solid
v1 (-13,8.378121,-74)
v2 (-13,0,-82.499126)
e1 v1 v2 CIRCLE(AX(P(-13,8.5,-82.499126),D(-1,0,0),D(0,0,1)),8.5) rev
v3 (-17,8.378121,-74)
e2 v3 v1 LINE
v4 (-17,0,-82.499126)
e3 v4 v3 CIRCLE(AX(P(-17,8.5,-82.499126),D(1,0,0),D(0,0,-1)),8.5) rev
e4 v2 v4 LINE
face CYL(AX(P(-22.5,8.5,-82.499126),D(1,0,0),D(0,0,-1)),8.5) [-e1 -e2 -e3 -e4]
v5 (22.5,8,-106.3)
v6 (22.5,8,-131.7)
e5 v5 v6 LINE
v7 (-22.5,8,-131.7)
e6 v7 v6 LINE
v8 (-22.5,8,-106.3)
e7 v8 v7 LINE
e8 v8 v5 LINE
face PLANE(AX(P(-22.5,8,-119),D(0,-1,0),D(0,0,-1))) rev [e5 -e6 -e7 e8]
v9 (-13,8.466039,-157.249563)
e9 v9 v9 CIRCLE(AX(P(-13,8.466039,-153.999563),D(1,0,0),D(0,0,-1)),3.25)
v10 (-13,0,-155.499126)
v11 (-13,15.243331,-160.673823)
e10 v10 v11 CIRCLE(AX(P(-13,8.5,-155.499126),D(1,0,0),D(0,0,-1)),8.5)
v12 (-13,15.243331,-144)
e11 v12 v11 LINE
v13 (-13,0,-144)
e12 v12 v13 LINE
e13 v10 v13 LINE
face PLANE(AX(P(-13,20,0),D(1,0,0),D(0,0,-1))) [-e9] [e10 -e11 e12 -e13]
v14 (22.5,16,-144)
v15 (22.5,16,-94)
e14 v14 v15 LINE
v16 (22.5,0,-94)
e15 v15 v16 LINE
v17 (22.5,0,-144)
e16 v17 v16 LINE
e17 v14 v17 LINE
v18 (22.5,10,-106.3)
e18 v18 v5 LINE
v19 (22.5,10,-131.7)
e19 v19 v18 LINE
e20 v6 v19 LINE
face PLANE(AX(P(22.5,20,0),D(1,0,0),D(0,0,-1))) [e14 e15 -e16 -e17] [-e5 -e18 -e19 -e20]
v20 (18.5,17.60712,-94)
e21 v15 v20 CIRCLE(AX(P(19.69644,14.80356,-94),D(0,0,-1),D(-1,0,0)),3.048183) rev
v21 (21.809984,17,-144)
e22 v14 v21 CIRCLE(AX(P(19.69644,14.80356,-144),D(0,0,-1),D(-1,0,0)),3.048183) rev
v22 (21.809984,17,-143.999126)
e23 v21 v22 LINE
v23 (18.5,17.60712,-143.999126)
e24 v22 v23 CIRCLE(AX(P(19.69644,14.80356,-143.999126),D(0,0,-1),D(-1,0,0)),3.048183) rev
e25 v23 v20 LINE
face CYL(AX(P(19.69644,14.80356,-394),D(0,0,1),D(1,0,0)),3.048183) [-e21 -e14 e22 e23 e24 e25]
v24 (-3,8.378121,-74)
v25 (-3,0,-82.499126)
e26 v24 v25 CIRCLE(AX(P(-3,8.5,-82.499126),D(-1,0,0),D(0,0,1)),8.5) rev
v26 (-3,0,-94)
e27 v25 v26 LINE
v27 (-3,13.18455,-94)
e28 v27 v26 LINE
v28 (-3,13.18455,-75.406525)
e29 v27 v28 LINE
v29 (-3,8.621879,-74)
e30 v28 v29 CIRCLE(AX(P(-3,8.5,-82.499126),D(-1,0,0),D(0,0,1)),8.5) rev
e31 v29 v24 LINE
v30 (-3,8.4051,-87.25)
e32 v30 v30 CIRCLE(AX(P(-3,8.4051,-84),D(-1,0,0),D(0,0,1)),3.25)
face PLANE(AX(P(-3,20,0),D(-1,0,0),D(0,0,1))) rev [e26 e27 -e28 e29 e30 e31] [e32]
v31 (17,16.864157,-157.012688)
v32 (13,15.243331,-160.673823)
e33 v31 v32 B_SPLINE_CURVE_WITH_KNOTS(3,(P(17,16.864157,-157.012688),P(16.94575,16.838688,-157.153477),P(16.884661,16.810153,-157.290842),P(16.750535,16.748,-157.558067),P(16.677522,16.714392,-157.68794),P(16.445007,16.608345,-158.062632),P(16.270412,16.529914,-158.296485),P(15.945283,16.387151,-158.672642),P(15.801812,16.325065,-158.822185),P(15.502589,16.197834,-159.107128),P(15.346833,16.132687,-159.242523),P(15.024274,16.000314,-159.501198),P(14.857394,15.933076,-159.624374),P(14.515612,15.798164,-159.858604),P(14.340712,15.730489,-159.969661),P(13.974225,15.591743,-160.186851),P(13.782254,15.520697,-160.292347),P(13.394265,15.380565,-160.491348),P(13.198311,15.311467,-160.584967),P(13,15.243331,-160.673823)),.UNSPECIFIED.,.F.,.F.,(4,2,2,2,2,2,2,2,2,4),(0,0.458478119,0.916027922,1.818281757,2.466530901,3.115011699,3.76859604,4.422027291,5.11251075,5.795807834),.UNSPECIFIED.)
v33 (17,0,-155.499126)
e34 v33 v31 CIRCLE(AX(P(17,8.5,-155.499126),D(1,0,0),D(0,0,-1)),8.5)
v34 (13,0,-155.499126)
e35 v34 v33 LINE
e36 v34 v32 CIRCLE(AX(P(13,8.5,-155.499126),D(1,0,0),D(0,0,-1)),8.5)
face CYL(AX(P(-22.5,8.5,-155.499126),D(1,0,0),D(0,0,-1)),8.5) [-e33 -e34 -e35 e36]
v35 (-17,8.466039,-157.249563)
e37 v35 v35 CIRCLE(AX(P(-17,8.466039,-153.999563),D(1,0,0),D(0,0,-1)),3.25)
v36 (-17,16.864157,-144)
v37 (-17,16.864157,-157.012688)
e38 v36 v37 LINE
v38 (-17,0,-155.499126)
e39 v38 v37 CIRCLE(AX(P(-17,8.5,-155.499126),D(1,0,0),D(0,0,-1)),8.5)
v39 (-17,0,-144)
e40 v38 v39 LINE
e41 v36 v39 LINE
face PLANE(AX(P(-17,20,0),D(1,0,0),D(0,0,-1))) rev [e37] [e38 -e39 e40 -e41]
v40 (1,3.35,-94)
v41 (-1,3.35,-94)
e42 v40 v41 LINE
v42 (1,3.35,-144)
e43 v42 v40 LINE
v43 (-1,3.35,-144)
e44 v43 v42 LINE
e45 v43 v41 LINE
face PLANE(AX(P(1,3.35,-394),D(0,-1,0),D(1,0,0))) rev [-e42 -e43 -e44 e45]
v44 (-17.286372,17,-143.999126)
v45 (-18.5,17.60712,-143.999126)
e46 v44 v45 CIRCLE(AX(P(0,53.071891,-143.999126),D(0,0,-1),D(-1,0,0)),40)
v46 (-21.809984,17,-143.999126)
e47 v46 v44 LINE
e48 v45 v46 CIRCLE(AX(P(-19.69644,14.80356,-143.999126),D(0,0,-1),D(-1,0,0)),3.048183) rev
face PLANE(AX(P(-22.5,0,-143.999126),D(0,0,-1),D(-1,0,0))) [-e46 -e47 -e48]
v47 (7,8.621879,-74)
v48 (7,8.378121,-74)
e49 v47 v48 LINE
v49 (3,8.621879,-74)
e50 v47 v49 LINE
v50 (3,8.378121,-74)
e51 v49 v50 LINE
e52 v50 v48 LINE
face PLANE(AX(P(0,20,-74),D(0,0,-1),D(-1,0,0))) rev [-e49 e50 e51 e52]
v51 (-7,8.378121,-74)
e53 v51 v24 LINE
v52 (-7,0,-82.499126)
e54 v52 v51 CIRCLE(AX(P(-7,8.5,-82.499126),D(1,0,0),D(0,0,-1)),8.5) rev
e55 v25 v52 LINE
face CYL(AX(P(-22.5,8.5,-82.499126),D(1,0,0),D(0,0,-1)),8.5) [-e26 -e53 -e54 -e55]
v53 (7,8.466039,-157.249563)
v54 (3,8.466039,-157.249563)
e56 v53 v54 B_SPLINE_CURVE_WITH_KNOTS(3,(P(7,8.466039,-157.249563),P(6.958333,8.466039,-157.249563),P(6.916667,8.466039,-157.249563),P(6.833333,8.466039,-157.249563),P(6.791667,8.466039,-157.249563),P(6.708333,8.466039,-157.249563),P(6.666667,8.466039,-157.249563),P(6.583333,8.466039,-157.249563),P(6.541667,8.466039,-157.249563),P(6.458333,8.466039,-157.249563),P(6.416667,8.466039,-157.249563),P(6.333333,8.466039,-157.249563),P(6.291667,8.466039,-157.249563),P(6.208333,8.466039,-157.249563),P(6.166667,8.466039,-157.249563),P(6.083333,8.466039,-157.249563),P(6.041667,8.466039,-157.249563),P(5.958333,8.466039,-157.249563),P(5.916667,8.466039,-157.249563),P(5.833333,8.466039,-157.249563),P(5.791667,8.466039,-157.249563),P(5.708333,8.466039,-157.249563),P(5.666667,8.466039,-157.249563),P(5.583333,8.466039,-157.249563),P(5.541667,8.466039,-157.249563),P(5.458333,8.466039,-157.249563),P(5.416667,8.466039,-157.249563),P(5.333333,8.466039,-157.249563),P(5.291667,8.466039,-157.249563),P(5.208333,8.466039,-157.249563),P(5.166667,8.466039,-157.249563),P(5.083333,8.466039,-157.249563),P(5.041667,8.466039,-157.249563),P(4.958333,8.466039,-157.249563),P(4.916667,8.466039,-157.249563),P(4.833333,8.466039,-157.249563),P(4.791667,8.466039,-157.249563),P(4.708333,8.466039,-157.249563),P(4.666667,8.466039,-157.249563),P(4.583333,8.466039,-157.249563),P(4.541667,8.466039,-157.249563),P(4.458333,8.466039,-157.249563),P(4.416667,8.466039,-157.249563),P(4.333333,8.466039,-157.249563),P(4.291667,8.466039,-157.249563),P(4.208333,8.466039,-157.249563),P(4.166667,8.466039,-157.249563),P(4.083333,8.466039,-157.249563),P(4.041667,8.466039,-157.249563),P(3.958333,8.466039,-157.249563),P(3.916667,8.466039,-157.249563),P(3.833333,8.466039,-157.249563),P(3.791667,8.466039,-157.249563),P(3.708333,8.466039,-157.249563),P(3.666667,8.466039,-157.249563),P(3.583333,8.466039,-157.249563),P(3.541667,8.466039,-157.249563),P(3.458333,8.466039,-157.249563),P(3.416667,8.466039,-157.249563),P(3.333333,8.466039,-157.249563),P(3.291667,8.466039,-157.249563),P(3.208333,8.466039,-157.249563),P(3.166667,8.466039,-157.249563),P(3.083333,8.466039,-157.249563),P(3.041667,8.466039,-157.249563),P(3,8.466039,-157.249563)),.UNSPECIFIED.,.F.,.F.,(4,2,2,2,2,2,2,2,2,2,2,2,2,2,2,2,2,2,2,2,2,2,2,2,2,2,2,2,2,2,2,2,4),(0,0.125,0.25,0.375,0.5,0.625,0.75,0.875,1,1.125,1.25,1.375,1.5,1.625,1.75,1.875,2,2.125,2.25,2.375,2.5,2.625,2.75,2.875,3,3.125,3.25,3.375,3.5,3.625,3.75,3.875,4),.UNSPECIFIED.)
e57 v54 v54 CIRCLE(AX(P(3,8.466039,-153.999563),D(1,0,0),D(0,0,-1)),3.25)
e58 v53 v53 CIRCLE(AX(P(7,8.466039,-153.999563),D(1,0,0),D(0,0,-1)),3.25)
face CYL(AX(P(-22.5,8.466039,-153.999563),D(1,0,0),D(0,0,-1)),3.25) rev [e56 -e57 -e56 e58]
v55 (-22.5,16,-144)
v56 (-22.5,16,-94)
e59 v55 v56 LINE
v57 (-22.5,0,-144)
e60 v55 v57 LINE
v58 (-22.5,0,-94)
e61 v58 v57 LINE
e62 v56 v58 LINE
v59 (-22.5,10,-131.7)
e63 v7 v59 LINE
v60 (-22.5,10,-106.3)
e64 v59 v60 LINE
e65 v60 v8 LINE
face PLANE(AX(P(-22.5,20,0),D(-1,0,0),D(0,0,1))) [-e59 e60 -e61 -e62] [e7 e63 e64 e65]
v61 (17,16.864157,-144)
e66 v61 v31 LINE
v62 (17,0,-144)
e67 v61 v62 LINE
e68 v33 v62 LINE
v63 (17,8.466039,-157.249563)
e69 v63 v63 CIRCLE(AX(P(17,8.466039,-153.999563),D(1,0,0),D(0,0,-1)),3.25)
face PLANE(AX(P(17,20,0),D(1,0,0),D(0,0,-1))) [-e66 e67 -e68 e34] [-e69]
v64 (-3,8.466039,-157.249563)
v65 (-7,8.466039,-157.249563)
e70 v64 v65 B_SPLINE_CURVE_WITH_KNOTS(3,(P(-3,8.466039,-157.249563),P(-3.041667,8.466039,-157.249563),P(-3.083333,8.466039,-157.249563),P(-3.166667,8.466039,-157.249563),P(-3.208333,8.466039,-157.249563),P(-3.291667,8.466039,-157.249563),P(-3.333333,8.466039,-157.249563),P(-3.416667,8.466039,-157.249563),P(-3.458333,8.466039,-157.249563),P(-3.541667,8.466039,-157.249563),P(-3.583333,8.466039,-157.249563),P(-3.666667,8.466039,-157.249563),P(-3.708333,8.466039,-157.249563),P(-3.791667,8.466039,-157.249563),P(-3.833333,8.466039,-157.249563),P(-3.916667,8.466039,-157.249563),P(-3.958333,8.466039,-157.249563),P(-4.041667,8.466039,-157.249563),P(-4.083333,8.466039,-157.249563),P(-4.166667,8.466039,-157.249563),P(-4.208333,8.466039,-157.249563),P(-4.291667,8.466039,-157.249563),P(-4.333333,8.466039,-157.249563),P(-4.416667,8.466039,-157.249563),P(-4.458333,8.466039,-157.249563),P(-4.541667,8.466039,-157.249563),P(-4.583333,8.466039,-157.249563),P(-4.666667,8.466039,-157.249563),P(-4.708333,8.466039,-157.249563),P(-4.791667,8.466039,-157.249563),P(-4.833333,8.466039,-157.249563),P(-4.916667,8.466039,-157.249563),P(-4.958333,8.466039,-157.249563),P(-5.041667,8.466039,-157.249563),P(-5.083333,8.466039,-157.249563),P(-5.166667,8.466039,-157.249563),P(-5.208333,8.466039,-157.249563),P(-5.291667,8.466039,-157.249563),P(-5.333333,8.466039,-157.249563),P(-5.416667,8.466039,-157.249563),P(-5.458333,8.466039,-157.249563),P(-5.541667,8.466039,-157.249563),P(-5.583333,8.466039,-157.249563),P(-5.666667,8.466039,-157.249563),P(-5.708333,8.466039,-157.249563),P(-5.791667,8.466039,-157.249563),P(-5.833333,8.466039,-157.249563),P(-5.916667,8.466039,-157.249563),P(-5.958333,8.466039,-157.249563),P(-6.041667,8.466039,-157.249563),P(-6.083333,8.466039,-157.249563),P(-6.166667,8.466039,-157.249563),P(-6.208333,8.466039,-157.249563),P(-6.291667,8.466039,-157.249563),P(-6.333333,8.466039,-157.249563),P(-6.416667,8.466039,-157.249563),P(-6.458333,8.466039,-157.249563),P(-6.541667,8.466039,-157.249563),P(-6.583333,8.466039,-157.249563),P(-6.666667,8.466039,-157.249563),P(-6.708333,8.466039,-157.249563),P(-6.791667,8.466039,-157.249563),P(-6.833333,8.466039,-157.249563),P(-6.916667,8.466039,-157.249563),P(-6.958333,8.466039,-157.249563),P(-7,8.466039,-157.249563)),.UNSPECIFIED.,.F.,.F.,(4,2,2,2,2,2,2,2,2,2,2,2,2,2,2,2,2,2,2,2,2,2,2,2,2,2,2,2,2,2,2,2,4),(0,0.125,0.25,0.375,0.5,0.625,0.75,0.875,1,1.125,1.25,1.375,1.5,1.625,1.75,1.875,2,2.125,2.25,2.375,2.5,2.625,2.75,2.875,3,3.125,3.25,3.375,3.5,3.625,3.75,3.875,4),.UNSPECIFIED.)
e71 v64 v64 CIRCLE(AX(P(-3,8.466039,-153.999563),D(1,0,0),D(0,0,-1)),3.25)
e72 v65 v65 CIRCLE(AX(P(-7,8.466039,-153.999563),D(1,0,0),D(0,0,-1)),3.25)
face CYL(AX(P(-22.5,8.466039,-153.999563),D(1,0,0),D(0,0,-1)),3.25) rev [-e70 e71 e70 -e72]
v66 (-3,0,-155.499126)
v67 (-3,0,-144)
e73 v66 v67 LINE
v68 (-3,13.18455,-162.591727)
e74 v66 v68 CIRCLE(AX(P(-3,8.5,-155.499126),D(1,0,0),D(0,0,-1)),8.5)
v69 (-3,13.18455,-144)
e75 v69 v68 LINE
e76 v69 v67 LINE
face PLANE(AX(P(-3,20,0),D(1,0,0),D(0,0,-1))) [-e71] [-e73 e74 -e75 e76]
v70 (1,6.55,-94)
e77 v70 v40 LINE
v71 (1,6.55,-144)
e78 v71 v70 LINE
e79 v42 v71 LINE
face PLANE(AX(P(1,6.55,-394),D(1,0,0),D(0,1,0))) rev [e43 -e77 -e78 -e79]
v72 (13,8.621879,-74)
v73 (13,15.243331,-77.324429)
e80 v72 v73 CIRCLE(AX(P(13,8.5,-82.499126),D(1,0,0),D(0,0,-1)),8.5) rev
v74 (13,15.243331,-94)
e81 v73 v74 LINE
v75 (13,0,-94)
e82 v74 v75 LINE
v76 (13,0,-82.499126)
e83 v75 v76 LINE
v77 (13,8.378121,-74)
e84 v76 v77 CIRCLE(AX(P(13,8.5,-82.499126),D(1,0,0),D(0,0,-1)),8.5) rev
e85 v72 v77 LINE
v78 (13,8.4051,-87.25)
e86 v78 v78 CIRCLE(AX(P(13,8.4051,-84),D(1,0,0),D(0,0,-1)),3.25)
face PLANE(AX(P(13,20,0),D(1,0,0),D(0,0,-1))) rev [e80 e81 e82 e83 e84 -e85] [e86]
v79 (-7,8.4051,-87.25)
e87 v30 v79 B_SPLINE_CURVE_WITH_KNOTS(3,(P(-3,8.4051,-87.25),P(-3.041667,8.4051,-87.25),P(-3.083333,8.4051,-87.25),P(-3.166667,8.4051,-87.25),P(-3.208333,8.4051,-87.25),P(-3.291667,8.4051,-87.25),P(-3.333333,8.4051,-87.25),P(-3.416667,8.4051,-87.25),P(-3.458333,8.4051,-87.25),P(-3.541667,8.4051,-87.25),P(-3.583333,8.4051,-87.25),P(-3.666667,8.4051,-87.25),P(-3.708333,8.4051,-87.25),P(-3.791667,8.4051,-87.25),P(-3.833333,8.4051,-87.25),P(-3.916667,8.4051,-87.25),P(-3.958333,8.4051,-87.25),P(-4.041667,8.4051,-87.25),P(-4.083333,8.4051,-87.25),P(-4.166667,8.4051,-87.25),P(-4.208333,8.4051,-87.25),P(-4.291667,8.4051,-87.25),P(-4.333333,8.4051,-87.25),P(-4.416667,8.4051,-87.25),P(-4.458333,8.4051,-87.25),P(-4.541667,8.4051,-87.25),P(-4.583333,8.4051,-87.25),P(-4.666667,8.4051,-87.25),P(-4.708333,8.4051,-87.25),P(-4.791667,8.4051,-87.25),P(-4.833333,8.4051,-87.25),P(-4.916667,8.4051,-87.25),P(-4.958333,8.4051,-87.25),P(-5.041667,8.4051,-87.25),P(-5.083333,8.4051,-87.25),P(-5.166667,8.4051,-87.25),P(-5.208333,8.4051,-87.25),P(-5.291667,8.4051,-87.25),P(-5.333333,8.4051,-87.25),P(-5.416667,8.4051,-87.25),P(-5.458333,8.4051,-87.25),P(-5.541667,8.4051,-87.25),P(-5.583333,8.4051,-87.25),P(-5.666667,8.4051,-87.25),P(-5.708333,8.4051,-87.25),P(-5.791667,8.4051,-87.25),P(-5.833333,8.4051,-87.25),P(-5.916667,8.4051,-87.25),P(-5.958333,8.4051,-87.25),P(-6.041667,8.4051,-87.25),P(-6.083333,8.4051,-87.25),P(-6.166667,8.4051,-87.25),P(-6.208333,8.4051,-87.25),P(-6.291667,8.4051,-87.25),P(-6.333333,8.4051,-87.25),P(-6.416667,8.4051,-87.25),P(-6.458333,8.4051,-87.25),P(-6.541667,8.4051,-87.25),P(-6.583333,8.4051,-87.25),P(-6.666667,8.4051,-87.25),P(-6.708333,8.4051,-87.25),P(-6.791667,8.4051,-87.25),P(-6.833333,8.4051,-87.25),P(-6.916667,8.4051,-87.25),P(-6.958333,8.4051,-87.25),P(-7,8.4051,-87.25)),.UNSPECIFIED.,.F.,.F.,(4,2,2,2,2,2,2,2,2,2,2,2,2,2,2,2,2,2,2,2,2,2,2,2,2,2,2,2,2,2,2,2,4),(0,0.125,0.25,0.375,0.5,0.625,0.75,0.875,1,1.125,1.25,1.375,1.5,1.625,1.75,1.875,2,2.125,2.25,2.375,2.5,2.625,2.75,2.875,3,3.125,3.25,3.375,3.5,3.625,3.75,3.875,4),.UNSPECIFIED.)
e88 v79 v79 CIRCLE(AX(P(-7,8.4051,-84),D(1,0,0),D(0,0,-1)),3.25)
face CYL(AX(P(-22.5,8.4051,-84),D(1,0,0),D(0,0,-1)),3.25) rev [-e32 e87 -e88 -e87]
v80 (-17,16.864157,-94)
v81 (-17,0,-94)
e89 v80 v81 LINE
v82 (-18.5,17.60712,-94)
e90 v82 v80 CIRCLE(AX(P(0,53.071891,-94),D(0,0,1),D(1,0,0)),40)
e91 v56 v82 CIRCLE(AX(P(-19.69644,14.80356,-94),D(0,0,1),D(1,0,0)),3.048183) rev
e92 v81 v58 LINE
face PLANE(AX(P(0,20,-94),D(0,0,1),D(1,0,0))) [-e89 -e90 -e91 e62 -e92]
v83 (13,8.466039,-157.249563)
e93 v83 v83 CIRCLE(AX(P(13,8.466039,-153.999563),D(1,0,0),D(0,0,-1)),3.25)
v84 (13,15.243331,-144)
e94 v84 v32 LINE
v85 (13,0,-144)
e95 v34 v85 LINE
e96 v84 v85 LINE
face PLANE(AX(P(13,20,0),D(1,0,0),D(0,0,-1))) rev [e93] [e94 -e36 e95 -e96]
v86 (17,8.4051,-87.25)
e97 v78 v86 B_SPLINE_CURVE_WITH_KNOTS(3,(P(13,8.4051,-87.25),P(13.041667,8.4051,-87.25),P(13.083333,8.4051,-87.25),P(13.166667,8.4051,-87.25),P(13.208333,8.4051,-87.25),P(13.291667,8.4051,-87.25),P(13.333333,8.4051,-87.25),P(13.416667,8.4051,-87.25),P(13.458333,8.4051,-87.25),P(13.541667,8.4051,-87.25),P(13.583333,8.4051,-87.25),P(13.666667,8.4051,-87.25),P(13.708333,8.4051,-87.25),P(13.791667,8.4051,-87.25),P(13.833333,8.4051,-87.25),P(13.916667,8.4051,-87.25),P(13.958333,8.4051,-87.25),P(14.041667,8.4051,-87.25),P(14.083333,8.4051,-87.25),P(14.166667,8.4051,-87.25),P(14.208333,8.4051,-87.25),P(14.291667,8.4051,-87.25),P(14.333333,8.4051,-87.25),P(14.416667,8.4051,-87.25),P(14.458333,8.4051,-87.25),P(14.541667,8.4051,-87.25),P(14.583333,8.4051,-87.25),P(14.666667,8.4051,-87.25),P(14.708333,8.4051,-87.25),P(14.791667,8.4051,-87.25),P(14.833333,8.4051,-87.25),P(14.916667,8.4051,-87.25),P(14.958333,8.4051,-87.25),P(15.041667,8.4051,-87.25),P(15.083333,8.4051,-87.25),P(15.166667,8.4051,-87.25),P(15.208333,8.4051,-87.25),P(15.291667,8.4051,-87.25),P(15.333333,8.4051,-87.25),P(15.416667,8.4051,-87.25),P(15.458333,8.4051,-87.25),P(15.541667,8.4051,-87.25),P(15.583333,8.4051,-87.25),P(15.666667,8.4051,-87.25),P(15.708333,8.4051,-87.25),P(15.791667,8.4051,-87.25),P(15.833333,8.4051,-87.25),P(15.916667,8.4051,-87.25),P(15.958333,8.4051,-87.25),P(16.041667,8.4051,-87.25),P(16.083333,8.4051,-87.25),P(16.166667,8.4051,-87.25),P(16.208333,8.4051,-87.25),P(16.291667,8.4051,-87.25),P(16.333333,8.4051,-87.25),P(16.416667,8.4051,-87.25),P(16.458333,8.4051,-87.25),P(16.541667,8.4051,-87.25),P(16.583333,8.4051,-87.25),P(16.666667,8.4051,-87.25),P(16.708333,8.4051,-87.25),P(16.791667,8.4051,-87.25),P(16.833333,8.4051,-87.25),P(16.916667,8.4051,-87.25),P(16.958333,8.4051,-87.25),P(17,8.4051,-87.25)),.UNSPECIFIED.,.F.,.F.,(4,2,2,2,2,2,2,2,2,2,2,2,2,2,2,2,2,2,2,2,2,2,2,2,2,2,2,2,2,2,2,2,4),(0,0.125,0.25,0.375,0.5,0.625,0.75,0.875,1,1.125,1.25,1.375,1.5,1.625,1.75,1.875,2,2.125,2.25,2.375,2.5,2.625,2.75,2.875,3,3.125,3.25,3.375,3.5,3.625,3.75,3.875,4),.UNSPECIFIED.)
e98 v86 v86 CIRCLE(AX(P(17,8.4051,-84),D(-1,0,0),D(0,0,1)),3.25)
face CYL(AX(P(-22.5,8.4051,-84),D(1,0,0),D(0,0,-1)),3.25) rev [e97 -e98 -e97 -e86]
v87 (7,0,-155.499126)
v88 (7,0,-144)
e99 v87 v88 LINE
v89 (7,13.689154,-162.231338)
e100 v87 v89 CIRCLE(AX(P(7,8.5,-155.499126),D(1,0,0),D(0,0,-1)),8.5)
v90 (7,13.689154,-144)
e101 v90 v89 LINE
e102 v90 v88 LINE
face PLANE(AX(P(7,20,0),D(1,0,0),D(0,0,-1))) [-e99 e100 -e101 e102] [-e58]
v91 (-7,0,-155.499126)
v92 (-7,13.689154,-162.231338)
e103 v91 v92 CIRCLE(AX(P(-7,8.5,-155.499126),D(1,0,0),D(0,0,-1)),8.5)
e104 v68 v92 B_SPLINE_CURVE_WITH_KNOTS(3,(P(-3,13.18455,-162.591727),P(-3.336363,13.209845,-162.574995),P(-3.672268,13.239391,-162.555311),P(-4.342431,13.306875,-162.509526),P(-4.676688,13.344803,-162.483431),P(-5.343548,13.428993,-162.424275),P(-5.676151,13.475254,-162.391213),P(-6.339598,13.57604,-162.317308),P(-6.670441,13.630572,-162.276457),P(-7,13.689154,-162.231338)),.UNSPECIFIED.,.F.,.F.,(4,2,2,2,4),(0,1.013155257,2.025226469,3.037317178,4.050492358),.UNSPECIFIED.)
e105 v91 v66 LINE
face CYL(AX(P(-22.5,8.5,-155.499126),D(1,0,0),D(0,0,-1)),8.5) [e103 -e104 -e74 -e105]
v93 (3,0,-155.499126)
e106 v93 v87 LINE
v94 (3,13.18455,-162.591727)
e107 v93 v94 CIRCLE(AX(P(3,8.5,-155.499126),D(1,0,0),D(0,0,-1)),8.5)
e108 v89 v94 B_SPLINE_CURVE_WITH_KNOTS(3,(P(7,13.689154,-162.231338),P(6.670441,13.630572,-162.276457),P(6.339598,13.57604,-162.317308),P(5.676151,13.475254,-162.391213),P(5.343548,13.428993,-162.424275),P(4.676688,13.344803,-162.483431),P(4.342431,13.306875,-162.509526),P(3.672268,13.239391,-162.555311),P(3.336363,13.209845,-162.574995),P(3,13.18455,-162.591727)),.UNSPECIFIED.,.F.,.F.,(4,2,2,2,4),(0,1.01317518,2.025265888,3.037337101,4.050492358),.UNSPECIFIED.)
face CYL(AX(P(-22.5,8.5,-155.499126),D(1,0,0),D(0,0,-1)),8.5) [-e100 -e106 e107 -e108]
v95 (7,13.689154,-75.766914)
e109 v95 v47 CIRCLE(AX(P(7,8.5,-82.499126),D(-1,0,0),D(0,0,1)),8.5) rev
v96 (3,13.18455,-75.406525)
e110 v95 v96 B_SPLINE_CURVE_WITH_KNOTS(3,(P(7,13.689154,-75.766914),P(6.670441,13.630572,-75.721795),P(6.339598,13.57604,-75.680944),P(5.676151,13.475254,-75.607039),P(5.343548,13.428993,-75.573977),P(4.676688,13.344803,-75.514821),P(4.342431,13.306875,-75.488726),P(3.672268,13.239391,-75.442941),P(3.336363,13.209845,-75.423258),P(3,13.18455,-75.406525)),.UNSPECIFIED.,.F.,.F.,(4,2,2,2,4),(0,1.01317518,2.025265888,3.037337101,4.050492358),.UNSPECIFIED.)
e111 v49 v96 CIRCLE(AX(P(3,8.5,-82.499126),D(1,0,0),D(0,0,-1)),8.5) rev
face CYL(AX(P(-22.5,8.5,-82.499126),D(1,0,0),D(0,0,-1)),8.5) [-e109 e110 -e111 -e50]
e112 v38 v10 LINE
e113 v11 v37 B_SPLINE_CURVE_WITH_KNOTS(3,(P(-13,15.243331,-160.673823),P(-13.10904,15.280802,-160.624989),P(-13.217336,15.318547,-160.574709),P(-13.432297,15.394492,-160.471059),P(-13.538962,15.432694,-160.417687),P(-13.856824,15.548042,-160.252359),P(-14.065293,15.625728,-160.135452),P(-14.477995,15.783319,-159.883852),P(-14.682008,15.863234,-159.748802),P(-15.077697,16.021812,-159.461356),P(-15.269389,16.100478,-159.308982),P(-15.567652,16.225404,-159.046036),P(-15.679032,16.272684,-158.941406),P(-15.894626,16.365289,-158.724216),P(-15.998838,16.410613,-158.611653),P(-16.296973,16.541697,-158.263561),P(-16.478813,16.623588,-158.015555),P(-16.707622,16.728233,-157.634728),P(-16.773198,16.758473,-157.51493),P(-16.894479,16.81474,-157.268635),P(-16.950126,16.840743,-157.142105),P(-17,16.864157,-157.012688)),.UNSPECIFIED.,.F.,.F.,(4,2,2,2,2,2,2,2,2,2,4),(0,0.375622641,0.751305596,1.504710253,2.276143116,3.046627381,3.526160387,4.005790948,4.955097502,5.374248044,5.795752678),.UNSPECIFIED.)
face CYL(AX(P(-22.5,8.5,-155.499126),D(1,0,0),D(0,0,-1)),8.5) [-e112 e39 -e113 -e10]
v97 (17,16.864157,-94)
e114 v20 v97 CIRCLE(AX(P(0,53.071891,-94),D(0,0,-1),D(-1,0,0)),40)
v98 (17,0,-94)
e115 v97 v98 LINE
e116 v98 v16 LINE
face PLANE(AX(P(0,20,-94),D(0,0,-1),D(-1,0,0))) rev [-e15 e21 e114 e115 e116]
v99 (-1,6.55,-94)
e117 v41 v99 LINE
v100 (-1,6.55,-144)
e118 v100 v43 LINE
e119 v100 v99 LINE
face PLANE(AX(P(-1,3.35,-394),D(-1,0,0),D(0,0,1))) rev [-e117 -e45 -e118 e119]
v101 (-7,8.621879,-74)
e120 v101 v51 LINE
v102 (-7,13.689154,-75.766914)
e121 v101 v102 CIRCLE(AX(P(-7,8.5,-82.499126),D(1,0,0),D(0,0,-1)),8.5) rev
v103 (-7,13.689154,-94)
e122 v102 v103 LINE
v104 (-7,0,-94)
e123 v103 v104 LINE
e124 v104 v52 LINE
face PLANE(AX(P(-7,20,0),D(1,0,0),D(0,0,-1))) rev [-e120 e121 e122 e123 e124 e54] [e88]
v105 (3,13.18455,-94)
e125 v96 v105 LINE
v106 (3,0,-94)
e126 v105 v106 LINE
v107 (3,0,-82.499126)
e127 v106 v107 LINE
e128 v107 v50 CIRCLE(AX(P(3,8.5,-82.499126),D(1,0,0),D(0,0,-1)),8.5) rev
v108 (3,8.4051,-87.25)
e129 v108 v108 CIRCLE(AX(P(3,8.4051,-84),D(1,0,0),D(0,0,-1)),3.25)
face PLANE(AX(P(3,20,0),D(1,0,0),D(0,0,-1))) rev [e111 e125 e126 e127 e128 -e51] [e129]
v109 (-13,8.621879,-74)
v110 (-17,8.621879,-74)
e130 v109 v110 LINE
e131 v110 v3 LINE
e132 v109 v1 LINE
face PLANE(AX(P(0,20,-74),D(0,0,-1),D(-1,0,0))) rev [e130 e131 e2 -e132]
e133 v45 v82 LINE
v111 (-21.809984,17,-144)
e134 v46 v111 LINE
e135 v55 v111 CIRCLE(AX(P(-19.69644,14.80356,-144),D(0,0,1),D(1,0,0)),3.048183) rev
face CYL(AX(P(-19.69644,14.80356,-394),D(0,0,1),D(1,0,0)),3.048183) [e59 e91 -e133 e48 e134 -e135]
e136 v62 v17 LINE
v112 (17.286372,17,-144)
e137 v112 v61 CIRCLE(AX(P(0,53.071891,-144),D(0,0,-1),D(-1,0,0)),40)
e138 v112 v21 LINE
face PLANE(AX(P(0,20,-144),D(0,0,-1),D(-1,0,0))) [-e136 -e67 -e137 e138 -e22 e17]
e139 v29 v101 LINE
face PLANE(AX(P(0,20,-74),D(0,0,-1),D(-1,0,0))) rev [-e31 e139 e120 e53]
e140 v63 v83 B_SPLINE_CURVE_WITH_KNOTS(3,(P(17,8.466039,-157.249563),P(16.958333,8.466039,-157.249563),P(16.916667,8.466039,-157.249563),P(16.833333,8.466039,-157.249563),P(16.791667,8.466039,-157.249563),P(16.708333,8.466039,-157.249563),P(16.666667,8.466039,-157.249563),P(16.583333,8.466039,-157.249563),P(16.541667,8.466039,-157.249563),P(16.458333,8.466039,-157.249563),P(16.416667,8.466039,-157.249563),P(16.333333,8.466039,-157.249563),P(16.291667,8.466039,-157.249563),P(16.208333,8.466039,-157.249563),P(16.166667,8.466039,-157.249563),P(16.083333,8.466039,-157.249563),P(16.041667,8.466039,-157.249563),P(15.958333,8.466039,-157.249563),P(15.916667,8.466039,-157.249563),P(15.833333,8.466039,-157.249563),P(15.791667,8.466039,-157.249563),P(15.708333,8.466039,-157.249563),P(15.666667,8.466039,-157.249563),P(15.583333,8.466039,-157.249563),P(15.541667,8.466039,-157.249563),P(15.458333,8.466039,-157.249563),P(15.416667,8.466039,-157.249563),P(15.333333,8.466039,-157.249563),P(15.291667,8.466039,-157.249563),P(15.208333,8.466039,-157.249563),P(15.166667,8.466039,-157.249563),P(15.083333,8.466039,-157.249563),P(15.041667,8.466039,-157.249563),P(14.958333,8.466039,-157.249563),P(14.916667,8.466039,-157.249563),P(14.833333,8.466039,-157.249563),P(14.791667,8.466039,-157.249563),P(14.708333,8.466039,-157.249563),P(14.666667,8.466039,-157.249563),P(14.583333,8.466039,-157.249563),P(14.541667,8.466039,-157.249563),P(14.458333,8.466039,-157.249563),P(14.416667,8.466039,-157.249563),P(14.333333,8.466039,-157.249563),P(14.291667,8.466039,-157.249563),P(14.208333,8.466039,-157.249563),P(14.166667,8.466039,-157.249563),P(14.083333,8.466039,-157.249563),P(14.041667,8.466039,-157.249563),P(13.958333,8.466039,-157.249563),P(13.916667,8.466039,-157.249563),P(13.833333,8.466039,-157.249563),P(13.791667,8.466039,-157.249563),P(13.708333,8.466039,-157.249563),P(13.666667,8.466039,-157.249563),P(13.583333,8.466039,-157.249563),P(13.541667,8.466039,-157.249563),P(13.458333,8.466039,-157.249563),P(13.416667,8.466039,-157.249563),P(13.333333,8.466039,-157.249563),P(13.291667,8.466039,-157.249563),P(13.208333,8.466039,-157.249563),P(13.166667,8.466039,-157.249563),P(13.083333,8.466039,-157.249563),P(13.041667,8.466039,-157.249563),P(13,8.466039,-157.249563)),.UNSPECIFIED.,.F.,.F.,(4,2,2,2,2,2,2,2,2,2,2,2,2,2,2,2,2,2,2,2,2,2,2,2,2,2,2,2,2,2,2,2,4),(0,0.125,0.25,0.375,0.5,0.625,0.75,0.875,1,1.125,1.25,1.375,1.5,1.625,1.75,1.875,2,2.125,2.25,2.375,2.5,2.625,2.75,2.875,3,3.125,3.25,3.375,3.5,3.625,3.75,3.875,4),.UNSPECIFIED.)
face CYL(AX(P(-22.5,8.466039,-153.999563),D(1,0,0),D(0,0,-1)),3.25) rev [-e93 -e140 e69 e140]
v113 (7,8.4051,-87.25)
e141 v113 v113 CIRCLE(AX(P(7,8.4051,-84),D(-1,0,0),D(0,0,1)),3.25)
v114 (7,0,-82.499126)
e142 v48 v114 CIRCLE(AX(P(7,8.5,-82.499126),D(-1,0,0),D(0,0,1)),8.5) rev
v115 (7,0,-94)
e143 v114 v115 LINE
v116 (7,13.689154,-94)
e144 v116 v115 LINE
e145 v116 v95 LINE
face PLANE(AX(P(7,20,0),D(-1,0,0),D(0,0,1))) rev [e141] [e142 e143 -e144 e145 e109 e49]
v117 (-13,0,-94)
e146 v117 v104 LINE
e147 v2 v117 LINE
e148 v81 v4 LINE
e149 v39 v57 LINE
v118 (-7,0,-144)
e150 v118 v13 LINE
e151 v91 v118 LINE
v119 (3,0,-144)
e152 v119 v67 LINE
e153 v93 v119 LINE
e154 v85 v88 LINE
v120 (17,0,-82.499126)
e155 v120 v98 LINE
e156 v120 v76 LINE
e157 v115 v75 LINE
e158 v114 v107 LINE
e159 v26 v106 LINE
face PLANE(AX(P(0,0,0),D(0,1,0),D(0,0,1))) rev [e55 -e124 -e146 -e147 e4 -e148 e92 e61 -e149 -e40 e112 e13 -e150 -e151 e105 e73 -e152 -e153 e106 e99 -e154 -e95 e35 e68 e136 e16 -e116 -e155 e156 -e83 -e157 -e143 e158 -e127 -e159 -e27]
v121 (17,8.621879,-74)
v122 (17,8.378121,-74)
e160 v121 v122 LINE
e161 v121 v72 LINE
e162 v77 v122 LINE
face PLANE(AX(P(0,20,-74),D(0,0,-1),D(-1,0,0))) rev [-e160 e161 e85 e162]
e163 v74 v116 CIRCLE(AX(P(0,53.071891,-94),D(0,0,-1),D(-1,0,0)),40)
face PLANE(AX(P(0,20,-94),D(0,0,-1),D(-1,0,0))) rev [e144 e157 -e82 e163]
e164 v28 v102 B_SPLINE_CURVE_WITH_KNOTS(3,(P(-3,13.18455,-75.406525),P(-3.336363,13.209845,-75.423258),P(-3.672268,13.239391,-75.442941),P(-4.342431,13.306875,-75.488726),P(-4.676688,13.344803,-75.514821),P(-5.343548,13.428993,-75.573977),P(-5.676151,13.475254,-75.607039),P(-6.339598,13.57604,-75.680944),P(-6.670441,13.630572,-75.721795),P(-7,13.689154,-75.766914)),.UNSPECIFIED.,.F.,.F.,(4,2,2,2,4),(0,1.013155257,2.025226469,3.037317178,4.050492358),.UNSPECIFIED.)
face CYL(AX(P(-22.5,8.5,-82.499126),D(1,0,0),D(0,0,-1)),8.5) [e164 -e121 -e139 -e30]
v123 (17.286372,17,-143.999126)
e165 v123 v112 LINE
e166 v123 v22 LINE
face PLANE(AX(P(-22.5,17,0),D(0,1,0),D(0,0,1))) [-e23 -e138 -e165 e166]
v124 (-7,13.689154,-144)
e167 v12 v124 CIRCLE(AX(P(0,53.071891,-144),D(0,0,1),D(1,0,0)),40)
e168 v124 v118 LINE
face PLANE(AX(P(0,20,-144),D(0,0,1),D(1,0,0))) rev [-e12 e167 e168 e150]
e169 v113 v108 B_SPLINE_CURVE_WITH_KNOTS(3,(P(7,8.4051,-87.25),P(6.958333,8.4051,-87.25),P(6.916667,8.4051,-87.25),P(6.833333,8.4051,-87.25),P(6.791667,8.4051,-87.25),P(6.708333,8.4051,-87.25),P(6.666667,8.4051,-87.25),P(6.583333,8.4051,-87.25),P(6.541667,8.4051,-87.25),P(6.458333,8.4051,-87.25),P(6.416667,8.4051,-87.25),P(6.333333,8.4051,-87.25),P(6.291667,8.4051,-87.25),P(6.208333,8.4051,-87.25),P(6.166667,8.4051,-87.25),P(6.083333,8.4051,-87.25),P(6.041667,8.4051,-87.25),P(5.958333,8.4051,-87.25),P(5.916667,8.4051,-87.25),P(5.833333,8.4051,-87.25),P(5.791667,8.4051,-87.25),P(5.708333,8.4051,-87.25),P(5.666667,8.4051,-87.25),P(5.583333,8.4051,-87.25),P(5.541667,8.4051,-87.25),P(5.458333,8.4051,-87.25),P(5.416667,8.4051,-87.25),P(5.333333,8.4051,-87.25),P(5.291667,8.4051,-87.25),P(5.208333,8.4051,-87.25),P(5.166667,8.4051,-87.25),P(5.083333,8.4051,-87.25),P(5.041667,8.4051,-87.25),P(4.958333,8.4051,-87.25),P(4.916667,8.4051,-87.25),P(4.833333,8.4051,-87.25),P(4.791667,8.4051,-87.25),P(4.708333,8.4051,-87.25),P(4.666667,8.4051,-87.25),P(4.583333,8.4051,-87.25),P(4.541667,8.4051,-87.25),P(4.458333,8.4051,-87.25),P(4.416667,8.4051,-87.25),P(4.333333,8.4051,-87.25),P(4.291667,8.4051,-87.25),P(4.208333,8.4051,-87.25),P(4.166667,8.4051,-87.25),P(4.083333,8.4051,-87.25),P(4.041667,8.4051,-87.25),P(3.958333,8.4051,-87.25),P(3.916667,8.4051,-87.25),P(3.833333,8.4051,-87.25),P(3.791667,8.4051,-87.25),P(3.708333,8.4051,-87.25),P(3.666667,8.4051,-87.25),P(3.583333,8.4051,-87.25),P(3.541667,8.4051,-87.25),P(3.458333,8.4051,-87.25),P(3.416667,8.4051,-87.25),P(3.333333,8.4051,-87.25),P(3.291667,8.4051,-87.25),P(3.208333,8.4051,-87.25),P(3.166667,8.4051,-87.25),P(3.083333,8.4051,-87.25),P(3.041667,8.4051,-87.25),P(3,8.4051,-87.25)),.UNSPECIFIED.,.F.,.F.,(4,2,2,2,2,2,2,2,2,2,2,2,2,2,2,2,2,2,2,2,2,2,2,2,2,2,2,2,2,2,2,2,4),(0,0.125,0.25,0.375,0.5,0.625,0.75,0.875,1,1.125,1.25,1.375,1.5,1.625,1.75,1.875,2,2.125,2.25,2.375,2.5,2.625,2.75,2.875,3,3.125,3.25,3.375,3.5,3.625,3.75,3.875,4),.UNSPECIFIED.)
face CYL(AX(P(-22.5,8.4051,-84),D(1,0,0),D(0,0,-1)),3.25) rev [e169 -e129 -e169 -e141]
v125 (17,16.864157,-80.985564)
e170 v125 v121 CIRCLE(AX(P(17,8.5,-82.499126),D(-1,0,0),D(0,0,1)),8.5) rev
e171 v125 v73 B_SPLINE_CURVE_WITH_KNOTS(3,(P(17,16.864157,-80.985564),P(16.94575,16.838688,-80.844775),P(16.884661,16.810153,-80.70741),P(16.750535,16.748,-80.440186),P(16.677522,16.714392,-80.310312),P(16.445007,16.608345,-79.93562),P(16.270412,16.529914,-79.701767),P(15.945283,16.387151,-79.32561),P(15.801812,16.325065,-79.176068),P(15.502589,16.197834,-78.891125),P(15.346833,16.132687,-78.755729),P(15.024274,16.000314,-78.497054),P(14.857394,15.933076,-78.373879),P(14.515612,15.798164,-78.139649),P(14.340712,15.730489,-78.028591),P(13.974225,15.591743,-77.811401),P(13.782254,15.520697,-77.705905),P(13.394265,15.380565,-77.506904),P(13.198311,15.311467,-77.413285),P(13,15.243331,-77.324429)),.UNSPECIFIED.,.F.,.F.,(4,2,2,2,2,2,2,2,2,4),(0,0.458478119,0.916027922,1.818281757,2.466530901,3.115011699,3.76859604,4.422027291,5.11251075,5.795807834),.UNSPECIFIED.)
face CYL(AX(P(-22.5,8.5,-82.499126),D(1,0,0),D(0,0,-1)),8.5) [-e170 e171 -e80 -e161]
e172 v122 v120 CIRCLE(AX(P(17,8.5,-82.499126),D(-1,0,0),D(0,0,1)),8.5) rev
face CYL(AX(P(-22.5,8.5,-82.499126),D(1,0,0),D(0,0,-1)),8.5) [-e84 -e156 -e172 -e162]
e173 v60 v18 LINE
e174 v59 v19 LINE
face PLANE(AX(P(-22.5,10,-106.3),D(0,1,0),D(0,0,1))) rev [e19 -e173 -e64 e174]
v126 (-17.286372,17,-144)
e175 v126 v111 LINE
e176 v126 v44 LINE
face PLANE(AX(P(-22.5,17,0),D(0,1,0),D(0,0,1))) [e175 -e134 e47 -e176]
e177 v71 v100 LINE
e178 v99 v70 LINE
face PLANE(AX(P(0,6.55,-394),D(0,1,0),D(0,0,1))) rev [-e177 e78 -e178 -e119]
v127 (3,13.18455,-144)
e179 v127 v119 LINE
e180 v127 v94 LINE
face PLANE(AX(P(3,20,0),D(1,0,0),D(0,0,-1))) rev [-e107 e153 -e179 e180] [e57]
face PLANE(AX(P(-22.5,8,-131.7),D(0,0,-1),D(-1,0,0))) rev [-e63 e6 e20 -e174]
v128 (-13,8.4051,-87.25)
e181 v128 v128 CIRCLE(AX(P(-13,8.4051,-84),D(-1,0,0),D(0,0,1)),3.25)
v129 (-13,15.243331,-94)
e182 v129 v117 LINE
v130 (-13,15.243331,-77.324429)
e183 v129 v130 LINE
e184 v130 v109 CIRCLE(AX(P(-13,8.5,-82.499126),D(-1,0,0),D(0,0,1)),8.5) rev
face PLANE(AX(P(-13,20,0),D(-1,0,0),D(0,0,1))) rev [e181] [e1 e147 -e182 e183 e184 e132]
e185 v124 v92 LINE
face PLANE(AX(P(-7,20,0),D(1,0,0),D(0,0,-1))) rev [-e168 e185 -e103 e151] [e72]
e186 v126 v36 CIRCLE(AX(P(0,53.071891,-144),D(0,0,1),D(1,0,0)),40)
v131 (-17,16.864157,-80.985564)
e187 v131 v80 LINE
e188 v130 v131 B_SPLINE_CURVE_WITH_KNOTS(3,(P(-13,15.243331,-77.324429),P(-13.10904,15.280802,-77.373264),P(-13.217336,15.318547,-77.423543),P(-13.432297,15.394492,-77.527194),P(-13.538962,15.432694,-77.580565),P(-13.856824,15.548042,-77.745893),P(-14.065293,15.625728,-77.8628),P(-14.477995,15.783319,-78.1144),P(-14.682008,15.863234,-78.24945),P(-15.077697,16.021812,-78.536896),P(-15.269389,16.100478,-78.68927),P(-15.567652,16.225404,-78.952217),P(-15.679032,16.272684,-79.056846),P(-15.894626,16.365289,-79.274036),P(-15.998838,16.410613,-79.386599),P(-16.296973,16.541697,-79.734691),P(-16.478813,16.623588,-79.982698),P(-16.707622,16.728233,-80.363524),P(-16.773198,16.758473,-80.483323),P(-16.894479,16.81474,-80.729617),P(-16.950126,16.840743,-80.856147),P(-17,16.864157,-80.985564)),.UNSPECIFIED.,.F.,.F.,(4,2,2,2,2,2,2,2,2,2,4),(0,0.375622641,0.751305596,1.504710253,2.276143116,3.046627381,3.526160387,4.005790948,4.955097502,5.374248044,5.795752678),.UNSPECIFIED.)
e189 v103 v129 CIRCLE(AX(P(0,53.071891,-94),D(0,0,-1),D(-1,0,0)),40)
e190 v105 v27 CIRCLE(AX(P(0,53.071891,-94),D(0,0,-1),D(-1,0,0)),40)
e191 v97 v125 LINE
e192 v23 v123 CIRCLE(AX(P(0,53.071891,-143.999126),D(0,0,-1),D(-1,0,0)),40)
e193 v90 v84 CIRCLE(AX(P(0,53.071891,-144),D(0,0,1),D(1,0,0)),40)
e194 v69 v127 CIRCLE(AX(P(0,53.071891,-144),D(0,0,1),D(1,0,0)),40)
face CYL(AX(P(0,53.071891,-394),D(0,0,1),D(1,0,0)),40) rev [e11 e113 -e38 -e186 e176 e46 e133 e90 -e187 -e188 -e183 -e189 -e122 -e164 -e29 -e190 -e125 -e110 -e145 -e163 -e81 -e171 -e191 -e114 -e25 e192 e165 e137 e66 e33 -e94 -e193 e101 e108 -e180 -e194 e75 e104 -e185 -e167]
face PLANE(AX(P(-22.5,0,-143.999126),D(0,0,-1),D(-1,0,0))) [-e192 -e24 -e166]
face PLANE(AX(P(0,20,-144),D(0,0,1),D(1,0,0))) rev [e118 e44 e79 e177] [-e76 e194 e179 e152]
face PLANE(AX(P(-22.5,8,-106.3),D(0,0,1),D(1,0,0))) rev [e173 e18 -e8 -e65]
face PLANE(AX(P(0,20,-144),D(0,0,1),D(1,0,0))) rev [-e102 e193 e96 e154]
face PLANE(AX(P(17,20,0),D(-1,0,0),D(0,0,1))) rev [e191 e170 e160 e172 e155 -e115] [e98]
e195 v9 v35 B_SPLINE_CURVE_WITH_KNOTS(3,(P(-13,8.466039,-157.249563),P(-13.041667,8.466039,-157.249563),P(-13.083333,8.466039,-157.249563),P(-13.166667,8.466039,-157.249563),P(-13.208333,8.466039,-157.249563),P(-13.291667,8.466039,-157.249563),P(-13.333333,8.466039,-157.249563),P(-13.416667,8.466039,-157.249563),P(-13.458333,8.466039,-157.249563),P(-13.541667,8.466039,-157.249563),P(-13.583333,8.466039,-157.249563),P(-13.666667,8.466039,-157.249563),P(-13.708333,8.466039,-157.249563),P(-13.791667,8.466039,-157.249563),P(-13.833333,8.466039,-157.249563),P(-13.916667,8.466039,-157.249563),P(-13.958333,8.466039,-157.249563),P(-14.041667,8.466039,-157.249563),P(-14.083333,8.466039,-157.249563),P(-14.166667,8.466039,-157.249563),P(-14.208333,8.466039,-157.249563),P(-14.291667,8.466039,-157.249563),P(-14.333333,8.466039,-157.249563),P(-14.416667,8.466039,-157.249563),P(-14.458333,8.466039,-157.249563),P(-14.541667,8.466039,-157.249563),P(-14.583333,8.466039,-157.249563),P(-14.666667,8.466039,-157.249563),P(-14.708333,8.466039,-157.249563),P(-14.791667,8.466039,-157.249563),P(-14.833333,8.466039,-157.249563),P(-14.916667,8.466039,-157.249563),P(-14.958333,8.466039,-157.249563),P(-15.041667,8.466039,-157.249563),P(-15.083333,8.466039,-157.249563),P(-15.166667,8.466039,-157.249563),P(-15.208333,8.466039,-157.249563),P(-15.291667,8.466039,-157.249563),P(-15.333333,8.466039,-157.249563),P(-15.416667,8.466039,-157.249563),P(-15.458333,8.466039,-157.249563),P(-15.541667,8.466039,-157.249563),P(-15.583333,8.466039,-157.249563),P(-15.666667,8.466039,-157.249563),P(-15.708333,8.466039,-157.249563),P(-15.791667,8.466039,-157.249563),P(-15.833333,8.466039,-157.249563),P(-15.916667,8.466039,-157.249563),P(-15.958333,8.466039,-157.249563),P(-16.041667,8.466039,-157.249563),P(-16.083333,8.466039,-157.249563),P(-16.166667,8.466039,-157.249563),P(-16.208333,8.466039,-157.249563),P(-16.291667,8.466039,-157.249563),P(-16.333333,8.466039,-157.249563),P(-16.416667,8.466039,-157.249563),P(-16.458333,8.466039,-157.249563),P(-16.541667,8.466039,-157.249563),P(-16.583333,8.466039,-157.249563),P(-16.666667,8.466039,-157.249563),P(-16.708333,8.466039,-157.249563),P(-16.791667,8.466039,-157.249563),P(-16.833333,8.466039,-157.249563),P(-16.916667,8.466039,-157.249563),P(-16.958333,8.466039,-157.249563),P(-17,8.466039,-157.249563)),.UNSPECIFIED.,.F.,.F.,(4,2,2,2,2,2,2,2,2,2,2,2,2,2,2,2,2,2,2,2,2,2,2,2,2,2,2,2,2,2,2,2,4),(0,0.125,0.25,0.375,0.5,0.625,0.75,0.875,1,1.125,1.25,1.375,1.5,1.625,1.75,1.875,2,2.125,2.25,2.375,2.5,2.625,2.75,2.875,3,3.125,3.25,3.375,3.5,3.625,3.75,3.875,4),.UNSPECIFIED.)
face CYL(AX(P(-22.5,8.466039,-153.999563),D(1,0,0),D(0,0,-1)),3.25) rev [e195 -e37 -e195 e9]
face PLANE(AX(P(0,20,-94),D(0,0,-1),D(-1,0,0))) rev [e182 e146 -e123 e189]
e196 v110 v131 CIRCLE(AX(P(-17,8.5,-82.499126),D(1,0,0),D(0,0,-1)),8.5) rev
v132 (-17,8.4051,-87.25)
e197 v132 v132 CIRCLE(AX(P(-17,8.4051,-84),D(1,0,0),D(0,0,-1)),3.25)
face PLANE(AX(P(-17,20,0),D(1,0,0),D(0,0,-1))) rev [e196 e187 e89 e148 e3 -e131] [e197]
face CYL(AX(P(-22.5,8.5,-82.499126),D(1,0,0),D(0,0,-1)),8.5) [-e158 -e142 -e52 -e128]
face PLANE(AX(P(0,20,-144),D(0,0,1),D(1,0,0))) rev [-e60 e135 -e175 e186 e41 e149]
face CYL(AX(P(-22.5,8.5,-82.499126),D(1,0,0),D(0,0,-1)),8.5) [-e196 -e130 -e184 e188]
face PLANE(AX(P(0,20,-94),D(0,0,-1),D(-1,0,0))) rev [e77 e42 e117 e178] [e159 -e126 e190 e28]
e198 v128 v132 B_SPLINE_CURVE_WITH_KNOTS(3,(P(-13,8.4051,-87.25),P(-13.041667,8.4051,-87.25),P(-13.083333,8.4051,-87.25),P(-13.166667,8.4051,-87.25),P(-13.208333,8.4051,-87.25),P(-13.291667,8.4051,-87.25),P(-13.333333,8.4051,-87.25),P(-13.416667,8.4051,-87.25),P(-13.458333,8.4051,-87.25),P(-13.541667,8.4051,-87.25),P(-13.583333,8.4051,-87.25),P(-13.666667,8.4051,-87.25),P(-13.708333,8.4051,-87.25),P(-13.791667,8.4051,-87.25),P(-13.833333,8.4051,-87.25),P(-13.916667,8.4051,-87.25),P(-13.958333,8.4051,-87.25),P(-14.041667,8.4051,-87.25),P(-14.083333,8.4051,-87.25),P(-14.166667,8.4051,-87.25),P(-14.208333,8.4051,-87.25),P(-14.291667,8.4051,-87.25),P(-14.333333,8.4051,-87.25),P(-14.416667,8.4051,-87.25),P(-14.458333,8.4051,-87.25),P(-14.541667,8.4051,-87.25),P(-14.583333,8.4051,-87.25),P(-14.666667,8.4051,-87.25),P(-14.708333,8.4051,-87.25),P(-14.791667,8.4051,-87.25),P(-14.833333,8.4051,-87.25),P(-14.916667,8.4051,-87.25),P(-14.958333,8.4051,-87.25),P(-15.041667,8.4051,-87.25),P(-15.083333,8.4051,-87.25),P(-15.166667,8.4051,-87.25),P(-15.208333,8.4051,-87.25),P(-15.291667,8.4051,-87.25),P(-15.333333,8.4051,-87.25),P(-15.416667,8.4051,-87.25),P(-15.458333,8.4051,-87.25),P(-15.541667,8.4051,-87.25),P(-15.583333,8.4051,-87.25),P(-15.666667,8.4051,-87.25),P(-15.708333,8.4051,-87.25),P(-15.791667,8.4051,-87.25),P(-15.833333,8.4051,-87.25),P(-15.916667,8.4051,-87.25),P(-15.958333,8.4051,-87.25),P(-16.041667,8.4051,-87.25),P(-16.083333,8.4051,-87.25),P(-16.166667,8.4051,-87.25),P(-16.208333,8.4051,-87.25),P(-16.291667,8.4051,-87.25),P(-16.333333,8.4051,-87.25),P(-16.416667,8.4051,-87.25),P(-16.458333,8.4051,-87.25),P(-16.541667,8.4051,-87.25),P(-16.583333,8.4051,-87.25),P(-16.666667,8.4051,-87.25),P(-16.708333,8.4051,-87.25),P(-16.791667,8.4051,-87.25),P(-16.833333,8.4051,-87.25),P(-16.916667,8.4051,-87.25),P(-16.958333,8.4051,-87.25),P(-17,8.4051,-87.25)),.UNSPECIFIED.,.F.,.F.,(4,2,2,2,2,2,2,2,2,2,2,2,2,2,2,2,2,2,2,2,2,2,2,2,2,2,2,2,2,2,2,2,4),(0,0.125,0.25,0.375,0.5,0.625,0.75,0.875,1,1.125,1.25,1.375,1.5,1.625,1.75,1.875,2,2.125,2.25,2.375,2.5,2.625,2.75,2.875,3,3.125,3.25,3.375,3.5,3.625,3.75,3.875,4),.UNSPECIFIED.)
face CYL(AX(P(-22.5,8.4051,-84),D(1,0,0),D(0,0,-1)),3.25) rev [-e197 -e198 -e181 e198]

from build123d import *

# Parameters (mm, degrees)
BOSS_EXTRUDE1_DEPTH = 20
CUT_EXTRUDE21_DEPTH = 45
CUT_EXTRUDE23_DEPTH = 444
SKETCH9_R           = 3.25
SKETCH9_R_2         = 3.15
CUT_EXTRUDE24_DEPTH = 45
CUT_EXTRUDE26_DEPTH = 444
CUT_EXTRUDE27_DEPTH = 45


with BuildPart() as part:
    # Sketch1 → Boss-Extrude1 (new body)
    with BuildSketch(Plane(origin=(0, 0, 0), x_dir=(1, 0, 0), z_dir=(0, 1, 0))):
        Polygon((-17, 94), (-17, 74), (-15, 74), (-13, 74), (-13, 94), (-12.5, 94), (-7.5, 94), (-7, 94), (-7, 74), (-5, 74), (-3, 74), (-3, 94), (-2.5, 94), (2.5, 94), (3, 94), (3, 74), (5, 74), (7, 74), (7, 94), (7.5, 94), (12.5, 94), (13, 94), (13, 74), (17, 74), (17, 94), (17.5, 94), (22.5, 94), (22.5, 144), (17.5, 144), (17, 144), (17, 164), (15, 164), (13, 164), (13, 144), (12.5, 144), (7.5, 144), (7, 144), (7, 164), (5, 164), (3, 164), (3, 144), (2.5, 144), (-2.5, 144), (-3, 144), (-3, 164), (-5, 164), (-7, 164), (-7, 144), (-7.5, 144), (-12.5, 144), (-13, 144), (-13, 164), (-15, 164), (-17, 164), (-17, 144), (-17.5, 144), (-22.5, 144), (-22.5, 94), (-17.5, 94), align=None)
    extrude(amount=BOSS_EXTRUDE1_DEPTH)

    # Sketch7 → Cut-Extrude21 (cut)
    with BuildSketch(Plane(origin=(22.5, 0, 0), x_dir=(0, 0, -1), z_dir=(1, 0, 0))):
        with BuildLine():
            ThreePointArc((73.999126156, 8.5), (76.488718516, 14.51040764), (82.499126156, 17))
            Line((82.499126156, 17), (93.999126156, 17))
            Line((93.999126156, 17), (93.999126156, 20))
            Line((93.999126156, 20), (73.999126156, 20))
            Line((73.999126156, 20), (73.999126156, 8.5))
        make_face()
        with BuildLine():
            ThreePointArc((82.499126156, 0), (76.488718516, 2.48959236), (73.999126156, 8.5))
            Line((73.999126156, 8.5), (73.999126156, 0))
            Line((73.999126156, 0), (82.499126156, 0))
        make_face()
        with BuildLine():
            ThreePointArc((155.499126156, 17), (163.999126156, 8.5), (155.499126156, 0))
            Line((155.499126156, 0), (164.814039075, 0))
            Line((164.814039075, 0), (164.814039075, 20))
            Line((164.814039075, 20), (143.999126156, 20))
            Line((143.999126156, 20), (143.999126156, 17))
            Line((143.999126156, 17), (155.499126156, 17))
        make_face()
    extrude(amount=-CUT_EXTRUDE21_DEPTH, mode=Mode.SUBTRACT)

    # Sketch2 → Cut-Extrude23 (cut)
    with BuildSketch(Plane.XY.offset(50)):
        with BuildLine():
            Line((-22.5, 20), (22.5, 20))
            Line((22.5, 20), (22.5, 16))
            ThreePointArc((22.5, 16), (20.832845478, 17.631987193), (18.5, 17.607120136))
            ThreePointArc((18.5, 17.607120136), (0, 13.071891388), (-18.5, 17.607120136))
            ThreePointArc((-18.5, 17.607120136), (-20.832845478, 17.631987193), (-22.5, 16))
            Line((-22.5, 16), (-22.5, 20))
        make_face()
    extrude(amount=-CUT_EXTRUDE23_DEPTH, mode=Mode.SUBTRACT)

    # Sketch9 → Cut-Extrude24 (cut)
    with BuildSketch(Plane(origin=(22.5, 0, 0), x_dir=(0, 0, -1), z_dir=(1, 0, 0))):
        with Locations((153.999563078, 8.466039352)):
            Circle(SKETCH9_R)
        with Locations((84, 8.405099657)):
            Circle(SKETCH9_R)
        with Locations((178, 8.5)):
            Circle(SKETCH9_R_2)
        with Locations((60, 8.5)):
            Circle(SKETCH9_R_2)
    extrude(amount=-CUT_EXTRUDE24_DEPTH, mode=Mode.SUBTRACT)

    # Sketch12 → Cut-Extrude26 (cut)
    with BuildSketch(Plane.XY.offset(50)):
        Polygon((-1, 3.35), (-1, 6.55), (0, 6.55), (1, 6.55), (1, 3.35), align=None)
    extrude(amount=-CUT_EXTRUDE26_DEPTH, mode=Mode.SUBTRACT)

    # Sketch13 → Cut-Extrude27 (cut)
    with BuildSketch(Plane(origin=(22.5, 0, 0), x_dir=(0, 0, -1), z_dir=(1, 0, 0))):
        Polygon((119, 8), (131.7, 8), (131.7, 10), (106.3, 10), (106.3, 8), align=None)
    extrude(amount=-CUT_EXTRUDE27_DEPTH, mode=Mode.SUBTRACT)


solid = part.part
